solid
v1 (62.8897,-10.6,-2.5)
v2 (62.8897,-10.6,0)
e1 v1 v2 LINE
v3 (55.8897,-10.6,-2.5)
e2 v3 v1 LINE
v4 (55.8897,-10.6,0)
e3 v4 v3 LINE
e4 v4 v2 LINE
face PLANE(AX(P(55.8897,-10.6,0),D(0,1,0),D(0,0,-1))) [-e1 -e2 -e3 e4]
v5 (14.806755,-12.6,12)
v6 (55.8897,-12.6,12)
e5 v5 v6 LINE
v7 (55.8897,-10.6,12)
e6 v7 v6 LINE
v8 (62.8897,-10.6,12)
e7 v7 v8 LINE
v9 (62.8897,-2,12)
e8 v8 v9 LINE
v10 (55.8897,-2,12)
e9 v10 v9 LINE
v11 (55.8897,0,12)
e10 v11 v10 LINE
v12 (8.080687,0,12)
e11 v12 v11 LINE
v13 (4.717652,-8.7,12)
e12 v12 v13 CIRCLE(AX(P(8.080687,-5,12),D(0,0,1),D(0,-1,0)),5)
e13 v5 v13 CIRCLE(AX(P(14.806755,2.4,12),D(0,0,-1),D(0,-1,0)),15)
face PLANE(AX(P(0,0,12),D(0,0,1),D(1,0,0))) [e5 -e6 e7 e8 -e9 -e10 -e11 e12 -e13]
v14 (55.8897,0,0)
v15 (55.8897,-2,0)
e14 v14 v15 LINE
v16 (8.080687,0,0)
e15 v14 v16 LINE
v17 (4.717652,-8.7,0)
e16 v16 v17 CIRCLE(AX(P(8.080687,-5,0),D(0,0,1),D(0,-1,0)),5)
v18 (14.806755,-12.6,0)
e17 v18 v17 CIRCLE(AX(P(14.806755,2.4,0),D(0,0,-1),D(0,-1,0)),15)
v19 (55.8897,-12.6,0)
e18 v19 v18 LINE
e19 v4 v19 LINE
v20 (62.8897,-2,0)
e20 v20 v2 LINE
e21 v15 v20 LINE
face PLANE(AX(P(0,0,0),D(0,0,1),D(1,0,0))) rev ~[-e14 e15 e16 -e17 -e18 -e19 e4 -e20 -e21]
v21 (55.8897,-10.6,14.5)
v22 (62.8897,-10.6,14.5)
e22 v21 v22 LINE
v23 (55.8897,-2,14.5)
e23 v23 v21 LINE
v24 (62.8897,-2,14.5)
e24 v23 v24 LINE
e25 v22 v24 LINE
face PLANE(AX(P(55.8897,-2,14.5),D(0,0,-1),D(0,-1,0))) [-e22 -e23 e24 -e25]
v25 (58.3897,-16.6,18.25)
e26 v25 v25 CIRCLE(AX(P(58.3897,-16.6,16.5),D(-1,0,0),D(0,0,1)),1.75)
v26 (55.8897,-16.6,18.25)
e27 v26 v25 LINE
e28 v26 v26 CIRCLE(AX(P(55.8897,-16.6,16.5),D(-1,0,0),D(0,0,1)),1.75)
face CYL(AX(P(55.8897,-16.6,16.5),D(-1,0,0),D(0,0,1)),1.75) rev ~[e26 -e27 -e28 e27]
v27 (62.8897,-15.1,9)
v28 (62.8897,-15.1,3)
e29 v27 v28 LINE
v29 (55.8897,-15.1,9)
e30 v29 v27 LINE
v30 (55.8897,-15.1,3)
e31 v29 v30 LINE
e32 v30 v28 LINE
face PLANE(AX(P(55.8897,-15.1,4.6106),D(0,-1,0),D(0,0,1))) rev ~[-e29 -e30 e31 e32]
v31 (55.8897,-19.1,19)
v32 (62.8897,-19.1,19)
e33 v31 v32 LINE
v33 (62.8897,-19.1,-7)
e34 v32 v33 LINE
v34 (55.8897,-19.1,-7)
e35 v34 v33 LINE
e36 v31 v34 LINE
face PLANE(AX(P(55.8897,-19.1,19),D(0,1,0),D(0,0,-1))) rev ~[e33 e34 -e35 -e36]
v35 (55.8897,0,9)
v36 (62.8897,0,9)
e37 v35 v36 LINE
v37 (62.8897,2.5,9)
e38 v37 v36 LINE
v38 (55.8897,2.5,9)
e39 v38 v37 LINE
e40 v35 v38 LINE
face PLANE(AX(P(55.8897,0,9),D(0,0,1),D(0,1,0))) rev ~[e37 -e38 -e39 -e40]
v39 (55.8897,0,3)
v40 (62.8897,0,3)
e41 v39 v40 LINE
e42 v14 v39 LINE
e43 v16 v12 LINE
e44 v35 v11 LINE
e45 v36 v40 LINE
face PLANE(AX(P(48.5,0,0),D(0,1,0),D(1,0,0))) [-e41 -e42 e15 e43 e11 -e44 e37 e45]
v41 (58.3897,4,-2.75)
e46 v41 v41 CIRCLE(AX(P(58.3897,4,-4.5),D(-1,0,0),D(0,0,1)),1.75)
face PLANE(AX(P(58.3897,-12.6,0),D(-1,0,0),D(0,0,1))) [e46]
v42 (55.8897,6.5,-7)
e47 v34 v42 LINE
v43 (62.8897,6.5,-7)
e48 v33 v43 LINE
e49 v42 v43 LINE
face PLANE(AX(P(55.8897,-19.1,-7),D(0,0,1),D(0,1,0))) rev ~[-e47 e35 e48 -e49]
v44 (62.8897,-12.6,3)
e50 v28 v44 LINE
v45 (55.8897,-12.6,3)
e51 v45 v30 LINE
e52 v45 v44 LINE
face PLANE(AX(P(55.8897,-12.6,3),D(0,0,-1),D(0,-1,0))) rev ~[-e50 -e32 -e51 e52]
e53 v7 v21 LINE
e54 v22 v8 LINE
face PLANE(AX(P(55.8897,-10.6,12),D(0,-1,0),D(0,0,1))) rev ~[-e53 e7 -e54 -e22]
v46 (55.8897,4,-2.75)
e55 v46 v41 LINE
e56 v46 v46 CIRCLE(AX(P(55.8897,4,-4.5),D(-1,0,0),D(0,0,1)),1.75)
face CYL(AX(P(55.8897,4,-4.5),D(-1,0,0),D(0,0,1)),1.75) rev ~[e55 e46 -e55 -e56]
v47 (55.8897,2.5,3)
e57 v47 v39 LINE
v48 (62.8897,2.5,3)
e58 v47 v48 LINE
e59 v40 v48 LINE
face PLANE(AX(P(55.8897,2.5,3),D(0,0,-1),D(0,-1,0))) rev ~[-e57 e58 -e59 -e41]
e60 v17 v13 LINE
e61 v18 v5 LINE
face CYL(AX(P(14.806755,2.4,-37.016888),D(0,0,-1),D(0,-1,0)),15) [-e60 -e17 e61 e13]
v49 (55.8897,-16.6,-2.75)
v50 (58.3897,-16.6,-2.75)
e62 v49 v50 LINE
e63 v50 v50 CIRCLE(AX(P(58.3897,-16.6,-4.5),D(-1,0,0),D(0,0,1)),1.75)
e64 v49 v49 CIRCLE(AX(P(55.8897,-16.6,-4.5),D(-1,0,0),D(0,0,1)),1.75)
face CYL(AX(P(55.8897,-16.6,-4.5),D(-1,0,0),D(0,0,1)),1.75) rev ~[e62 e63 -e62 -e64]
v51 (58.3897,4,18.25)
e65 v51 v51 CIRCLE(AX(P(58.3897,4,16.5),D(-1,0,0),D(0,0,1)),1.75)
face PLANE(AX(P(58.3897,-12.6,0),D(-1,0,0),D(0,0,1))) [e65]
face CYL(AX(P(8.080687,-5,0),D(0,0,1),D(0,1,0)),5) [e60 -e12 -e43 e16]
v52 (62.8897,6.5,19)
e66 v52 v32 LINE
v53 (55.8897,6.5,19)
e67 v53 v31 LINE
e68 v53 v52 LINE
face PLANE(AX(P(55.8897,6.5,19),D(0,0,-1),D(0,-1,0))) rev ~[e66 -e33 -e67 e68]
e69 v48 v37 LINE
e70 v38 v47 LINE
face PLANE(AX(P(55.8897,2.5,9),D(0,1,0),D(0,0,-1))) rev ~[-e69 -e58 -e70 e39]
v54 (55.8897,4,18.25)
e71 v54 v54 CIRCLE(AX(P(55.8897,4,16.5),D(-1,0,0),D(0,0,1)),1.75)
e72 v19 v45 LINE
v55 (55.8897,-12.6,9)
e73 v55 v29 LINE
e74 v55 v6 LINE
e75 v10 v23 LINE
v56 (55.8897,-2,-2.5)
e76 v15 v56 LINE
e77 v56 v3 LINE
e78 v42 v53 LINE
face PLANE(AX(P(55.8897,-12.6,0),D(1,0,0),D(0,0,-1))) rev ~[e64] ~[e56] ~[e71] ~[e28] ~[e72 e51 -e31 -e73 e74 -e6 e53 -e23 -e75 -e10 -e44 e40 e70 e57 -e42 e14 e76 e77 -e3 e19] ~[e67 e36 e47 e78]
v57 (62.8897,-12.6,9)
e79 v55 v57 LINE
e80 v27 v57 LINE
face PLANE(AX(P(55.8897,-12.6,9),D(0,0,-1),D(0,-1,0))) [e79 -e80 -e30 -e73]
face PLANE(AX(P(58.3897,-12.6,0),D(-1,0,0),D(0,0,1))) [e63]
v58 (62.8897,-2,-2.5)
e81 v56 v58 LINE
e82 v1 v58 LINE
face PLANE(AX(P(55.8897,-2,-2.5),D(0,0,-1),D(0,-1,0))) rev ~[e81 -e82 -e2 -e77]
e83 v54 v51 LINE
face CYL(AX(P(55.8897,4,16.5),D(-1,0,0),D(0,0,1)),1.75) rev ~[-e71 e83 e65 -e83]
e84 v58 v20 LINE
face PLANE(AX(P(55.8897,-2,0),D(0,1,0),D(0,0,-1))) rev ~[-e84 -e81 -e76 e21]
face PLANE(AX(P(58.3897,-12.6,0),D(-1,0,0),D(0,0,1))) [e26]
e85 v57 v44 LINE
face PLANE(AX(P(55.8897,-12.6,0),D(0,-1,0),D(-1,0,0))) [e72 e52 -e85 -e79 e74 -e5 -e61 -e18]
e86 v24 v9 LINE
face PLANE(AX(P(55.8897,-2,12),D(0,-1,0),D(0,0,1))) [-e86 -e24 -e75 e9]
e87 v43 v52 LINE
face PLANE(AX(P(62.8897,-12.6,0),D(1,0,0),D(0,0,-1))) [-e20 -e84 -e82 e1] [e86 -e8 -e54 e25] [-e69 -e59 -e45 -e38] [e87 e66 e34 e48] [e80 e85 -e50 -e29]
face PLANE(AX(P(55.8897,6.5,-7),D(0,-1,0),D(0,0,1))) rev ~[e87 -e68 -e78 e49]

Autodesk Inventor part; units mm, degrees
ref_plane "YZ Plane" through (0, 0, 0) normal (1, 0, 0) x (0, 1, 0)
ref_plane "XZ Plane" through (0, 0, 0) normal (0, 1, 0) x (-1, 0, 0)
ref_plane "XY Plane" through (0, 0, 0) normal (0, 0, 1) x (1, 0, 0)
sketch "Sketch5" plane through (0, 0, 0) normal (0, 0, 1) x (1, 0, 0)
  line L0 (48.5, 0) -> (3.8, 0)
  line L1 (48.5, -12.6) -> (3.8, -12.6)
  line L2 (3.8, -12.6) -> (0, -12.6)
  line L3 (0, -12.6) -> (0, 0)
  line L4 (0, 0) -> (7.8, 0)
  line L5 (38.5, 0) -> (38.5, -12.6)
  line L6 (37.5, -12.6) -> (37.5, 0)
  line L7 (0, -45.1294) -> (0, -34.3361)
  line L8 (0, -34.3361) -> (38.5, -34.3361)
  line L9 (38.5, -34.3361) -> (38.5, -45.1294)
  line L10 (38.5, -45.1294) -> (0, -45.1294)
  line L11 (38.5, -42.4105) -> (39.5, -42.4105)
  line L12 (39.5, -42.4105) -> (39.5, -38.1261)
  line L13 (39.5, -38.1261) -> (38.5, -38.1261)
  line L14 (39.5, -42.4105) -> (39.5, -49.5786)
  line L15 (39.5, -49.5786) -> (45, -49.5786)
  line L16 (45, -49.5786) -> (45, -34.3361)
  line L17 (45, -34.3361) -> (39.5, -34.3361)
  line L18 (39.5, -34.3361) -> (39.5, -38.1261)
  line L19 (48.5, 0) -> (55.8897, 0)
  line L20 (55.8897, 0) -> (55.8897, -12.6)
  line L21 (55.8897, -12.6) -> (48.5, -12.6)
  point P0 (7.8, 0)
  point P1 (39, -42.4105)
  dimension "d63" = 44.7
  dimension "d71" = 0
  dimension "d97" = 12.6
  dimension "d123" = 1
  dimension "d124" = 37.5
  dimension "d125" = 38.5
  dimension "d127" = 1
  dimension "d128" = 5.5
extrude "Extrusion2" add sketch "Sketch5" along normal blind 12 contours L19 L20 L21 L1 L5 L0 | L5 L1 L6 L0 | L6 L1 L2 L3 L4 L0
fillet "Fillet2" radius 15 1 edges at (0, -12.6, 6)
fillet "Rundung3" radius 5 1 edges at (0, 0, 6)
sketch "Skizze17" plane through (55.8897, -12.6, 0) normal (1, 0, 0) x (0, 0, -1)
  line L0 (-19, -6.5) -> (7, -6.5)
  line L1 (7, -6.5) -> (7, 19.1)
  line L2 (7, 19.1) -> (-19, 19.1)
  line L3 (-19, 19.1) -> (-19, -6.5)
  line L4 (-19, -6.5) -> (7, 19.1) construction
  line L5 (7, -6.5) -> (-19, 19.1) construction
  line L6 (0, 12.6) -> (-12, 12.6) projected
  line L7 (0, 0) -> (-12, 0) projected
  line L8 (0, 0) -> (0, 12.6) projected
  line L9 (-12, 0) -> (-12, 12.6) projected
  point P0 (-6, 6.3)
  point P1 (7, 6.3)
  dimension "d151" = 26
  dimension "d152" = 25.6
  dimension "d153" = 6.5
  dimension "d154" = 6.5
  dimension "d155" = 7
  dimension "d156" = 7
extrude "Extrusion12" add sketch "Skizze17" along normal blind 7 contours L3 L2 L1 L0 | L8 L7 L9 L6
sketch "Skizze18" plane through (55.8897, -12.6, 0) normal (-1, 0, 0) x (0, 0, 1)
  circle A0 centre (-4.5, 16.6) radius 1.75
  circle A1 centre (16.5, 16.6) radius 1.75
  circle A2 centre (16.5, -4) radius 1.75
  circle A3 centre (-4.5, -4) radius 1.75
  line L0 (-7, 19.1) -> (19, 19.1) projected
  line L1 (-7, -6.5) -> (-7, 19.1) projected
  line L2 (19, 19.1) -> (19, -6.5) projected
  line L3 (19, -6.5) -> (-7, -6.5) projected
  point P0 (0, 12.6)
  dimension "d135" = 3.5
  dimension "d136" = 2.5
  dimension "d137" = 2.5
  dimension "d138" = 3.5
  dimension "d139" = 2.5
  dimension "d140" = 2.5
  dimension "d141" = 2.5
  dimension "d142" = 2.5
  dimension "d143" = 2.5
  dimension "d144" = 2.5
  dimension "d145" = 3.5
  dimension "d146" = 3.5
extrude "Extrusion13" cut sketch "Skizze18" against normal blind 2.5 contours A0 | A1 | A2 | A3
sketch "Skizze22" plane through (55.8897, -12.6, 0) normal (-1, 0, 0) x (0, 0, 1)
  line L0 (0, 12.6) -> (10, 12.6)
  line L1 (9, 15.1) -> (3, 15.1)
  line L2 (-2.5, 10.6) -> (-2.5, 2)
  line L3 (4.6106, -2.5) -> (9, -2.5)
  line L4 (10, -0.0226) -> (9.9863, -0.0226)
  line L5 (9.9863, 12.8711) -> (10, 12.8711)
  line L6 (14.5, 10.6) -> (14.5, 2)
  line L7 (4.6106, -2.5) -> (3, -2.5)
  line L8 (12, 12.6) -> (0, 12.6) projected
  line L9 (0, 0) -> (0, 12.6) projected
  line L10 (0, 0) -> (0, 12.6)
  line L11 (0, 12.6) -> (12, 12.6)
  line L12 (0, 0) -> (12, 0) projected
  line L13 (0, 0) -> (10, 0)
  line L14 (11.3365, 15.1) -> (11.4, 15.1)
  line L15 (3, 15.1) -> (3, 12.6)
  line L16 (0, 10.6) -> (-2.5, 10.6)
  line L17 (10, 10.6) -> (14.5, 10.6)
  line L18 (9, 12.6) -> (9, 15.1)
  line L19 (0, 2) -> (-2.5, 2)
  line L20 (3, 0) -> (3, -2.5)
  line L21 (9, 0) -> (9, -2.5)
  line L22 (10, 2) -> (14.5, 2)
  line L23 (12, 12.6) -> (12, 3.9) projected
  line L24 (12, 3.9) -> (12, 0) projected
  line L25 (12, 10.6) -> (12, 1.95)
  line L26 (14.5, 2) -> (14.5, 10.6)
  point P0 (9, 13.85)
  point P1 (3, 13.85)
  point P2 (12.25, 2)
  point P3 (12.25, 10.6)
  point P4 (-1.25, 10.6)
  point P5 (-1.25, 2)
  point P6 (3, 0)
  point P7 (0, 2)
  point P8 (3, 12.6)
  point P9 (9, 12.6)
  point P10 (14.5, 6.3)
  point P11 (12, 2)
  dimension "d172" = 0
  dimension "d173" = 2.5
  dimension "d175" = 2.5
  dimension "d176" = 2.5
  dimension "d180" = 3
  dimension "d181" = 3
  dimension "d183" = 2
  dimension "d184" = 2
  dimension "d185" = 2
  dimension "d186" = 2
  dimension "d190" = 2.5
  dimension "d191" = 3
  dimension "d192" = 3
extrude "Extrusion19" cut sketch "Skizze22" against normal blind 10 contours L15 L1 L18 L0 | L9 L19 L2 L16 | L12 L21 L3 L7 L20 | L17 L6 L22 L24 L23
equation "\"l1\" = 8"
properties part number "Maria_Greifer_3D-Druck"
